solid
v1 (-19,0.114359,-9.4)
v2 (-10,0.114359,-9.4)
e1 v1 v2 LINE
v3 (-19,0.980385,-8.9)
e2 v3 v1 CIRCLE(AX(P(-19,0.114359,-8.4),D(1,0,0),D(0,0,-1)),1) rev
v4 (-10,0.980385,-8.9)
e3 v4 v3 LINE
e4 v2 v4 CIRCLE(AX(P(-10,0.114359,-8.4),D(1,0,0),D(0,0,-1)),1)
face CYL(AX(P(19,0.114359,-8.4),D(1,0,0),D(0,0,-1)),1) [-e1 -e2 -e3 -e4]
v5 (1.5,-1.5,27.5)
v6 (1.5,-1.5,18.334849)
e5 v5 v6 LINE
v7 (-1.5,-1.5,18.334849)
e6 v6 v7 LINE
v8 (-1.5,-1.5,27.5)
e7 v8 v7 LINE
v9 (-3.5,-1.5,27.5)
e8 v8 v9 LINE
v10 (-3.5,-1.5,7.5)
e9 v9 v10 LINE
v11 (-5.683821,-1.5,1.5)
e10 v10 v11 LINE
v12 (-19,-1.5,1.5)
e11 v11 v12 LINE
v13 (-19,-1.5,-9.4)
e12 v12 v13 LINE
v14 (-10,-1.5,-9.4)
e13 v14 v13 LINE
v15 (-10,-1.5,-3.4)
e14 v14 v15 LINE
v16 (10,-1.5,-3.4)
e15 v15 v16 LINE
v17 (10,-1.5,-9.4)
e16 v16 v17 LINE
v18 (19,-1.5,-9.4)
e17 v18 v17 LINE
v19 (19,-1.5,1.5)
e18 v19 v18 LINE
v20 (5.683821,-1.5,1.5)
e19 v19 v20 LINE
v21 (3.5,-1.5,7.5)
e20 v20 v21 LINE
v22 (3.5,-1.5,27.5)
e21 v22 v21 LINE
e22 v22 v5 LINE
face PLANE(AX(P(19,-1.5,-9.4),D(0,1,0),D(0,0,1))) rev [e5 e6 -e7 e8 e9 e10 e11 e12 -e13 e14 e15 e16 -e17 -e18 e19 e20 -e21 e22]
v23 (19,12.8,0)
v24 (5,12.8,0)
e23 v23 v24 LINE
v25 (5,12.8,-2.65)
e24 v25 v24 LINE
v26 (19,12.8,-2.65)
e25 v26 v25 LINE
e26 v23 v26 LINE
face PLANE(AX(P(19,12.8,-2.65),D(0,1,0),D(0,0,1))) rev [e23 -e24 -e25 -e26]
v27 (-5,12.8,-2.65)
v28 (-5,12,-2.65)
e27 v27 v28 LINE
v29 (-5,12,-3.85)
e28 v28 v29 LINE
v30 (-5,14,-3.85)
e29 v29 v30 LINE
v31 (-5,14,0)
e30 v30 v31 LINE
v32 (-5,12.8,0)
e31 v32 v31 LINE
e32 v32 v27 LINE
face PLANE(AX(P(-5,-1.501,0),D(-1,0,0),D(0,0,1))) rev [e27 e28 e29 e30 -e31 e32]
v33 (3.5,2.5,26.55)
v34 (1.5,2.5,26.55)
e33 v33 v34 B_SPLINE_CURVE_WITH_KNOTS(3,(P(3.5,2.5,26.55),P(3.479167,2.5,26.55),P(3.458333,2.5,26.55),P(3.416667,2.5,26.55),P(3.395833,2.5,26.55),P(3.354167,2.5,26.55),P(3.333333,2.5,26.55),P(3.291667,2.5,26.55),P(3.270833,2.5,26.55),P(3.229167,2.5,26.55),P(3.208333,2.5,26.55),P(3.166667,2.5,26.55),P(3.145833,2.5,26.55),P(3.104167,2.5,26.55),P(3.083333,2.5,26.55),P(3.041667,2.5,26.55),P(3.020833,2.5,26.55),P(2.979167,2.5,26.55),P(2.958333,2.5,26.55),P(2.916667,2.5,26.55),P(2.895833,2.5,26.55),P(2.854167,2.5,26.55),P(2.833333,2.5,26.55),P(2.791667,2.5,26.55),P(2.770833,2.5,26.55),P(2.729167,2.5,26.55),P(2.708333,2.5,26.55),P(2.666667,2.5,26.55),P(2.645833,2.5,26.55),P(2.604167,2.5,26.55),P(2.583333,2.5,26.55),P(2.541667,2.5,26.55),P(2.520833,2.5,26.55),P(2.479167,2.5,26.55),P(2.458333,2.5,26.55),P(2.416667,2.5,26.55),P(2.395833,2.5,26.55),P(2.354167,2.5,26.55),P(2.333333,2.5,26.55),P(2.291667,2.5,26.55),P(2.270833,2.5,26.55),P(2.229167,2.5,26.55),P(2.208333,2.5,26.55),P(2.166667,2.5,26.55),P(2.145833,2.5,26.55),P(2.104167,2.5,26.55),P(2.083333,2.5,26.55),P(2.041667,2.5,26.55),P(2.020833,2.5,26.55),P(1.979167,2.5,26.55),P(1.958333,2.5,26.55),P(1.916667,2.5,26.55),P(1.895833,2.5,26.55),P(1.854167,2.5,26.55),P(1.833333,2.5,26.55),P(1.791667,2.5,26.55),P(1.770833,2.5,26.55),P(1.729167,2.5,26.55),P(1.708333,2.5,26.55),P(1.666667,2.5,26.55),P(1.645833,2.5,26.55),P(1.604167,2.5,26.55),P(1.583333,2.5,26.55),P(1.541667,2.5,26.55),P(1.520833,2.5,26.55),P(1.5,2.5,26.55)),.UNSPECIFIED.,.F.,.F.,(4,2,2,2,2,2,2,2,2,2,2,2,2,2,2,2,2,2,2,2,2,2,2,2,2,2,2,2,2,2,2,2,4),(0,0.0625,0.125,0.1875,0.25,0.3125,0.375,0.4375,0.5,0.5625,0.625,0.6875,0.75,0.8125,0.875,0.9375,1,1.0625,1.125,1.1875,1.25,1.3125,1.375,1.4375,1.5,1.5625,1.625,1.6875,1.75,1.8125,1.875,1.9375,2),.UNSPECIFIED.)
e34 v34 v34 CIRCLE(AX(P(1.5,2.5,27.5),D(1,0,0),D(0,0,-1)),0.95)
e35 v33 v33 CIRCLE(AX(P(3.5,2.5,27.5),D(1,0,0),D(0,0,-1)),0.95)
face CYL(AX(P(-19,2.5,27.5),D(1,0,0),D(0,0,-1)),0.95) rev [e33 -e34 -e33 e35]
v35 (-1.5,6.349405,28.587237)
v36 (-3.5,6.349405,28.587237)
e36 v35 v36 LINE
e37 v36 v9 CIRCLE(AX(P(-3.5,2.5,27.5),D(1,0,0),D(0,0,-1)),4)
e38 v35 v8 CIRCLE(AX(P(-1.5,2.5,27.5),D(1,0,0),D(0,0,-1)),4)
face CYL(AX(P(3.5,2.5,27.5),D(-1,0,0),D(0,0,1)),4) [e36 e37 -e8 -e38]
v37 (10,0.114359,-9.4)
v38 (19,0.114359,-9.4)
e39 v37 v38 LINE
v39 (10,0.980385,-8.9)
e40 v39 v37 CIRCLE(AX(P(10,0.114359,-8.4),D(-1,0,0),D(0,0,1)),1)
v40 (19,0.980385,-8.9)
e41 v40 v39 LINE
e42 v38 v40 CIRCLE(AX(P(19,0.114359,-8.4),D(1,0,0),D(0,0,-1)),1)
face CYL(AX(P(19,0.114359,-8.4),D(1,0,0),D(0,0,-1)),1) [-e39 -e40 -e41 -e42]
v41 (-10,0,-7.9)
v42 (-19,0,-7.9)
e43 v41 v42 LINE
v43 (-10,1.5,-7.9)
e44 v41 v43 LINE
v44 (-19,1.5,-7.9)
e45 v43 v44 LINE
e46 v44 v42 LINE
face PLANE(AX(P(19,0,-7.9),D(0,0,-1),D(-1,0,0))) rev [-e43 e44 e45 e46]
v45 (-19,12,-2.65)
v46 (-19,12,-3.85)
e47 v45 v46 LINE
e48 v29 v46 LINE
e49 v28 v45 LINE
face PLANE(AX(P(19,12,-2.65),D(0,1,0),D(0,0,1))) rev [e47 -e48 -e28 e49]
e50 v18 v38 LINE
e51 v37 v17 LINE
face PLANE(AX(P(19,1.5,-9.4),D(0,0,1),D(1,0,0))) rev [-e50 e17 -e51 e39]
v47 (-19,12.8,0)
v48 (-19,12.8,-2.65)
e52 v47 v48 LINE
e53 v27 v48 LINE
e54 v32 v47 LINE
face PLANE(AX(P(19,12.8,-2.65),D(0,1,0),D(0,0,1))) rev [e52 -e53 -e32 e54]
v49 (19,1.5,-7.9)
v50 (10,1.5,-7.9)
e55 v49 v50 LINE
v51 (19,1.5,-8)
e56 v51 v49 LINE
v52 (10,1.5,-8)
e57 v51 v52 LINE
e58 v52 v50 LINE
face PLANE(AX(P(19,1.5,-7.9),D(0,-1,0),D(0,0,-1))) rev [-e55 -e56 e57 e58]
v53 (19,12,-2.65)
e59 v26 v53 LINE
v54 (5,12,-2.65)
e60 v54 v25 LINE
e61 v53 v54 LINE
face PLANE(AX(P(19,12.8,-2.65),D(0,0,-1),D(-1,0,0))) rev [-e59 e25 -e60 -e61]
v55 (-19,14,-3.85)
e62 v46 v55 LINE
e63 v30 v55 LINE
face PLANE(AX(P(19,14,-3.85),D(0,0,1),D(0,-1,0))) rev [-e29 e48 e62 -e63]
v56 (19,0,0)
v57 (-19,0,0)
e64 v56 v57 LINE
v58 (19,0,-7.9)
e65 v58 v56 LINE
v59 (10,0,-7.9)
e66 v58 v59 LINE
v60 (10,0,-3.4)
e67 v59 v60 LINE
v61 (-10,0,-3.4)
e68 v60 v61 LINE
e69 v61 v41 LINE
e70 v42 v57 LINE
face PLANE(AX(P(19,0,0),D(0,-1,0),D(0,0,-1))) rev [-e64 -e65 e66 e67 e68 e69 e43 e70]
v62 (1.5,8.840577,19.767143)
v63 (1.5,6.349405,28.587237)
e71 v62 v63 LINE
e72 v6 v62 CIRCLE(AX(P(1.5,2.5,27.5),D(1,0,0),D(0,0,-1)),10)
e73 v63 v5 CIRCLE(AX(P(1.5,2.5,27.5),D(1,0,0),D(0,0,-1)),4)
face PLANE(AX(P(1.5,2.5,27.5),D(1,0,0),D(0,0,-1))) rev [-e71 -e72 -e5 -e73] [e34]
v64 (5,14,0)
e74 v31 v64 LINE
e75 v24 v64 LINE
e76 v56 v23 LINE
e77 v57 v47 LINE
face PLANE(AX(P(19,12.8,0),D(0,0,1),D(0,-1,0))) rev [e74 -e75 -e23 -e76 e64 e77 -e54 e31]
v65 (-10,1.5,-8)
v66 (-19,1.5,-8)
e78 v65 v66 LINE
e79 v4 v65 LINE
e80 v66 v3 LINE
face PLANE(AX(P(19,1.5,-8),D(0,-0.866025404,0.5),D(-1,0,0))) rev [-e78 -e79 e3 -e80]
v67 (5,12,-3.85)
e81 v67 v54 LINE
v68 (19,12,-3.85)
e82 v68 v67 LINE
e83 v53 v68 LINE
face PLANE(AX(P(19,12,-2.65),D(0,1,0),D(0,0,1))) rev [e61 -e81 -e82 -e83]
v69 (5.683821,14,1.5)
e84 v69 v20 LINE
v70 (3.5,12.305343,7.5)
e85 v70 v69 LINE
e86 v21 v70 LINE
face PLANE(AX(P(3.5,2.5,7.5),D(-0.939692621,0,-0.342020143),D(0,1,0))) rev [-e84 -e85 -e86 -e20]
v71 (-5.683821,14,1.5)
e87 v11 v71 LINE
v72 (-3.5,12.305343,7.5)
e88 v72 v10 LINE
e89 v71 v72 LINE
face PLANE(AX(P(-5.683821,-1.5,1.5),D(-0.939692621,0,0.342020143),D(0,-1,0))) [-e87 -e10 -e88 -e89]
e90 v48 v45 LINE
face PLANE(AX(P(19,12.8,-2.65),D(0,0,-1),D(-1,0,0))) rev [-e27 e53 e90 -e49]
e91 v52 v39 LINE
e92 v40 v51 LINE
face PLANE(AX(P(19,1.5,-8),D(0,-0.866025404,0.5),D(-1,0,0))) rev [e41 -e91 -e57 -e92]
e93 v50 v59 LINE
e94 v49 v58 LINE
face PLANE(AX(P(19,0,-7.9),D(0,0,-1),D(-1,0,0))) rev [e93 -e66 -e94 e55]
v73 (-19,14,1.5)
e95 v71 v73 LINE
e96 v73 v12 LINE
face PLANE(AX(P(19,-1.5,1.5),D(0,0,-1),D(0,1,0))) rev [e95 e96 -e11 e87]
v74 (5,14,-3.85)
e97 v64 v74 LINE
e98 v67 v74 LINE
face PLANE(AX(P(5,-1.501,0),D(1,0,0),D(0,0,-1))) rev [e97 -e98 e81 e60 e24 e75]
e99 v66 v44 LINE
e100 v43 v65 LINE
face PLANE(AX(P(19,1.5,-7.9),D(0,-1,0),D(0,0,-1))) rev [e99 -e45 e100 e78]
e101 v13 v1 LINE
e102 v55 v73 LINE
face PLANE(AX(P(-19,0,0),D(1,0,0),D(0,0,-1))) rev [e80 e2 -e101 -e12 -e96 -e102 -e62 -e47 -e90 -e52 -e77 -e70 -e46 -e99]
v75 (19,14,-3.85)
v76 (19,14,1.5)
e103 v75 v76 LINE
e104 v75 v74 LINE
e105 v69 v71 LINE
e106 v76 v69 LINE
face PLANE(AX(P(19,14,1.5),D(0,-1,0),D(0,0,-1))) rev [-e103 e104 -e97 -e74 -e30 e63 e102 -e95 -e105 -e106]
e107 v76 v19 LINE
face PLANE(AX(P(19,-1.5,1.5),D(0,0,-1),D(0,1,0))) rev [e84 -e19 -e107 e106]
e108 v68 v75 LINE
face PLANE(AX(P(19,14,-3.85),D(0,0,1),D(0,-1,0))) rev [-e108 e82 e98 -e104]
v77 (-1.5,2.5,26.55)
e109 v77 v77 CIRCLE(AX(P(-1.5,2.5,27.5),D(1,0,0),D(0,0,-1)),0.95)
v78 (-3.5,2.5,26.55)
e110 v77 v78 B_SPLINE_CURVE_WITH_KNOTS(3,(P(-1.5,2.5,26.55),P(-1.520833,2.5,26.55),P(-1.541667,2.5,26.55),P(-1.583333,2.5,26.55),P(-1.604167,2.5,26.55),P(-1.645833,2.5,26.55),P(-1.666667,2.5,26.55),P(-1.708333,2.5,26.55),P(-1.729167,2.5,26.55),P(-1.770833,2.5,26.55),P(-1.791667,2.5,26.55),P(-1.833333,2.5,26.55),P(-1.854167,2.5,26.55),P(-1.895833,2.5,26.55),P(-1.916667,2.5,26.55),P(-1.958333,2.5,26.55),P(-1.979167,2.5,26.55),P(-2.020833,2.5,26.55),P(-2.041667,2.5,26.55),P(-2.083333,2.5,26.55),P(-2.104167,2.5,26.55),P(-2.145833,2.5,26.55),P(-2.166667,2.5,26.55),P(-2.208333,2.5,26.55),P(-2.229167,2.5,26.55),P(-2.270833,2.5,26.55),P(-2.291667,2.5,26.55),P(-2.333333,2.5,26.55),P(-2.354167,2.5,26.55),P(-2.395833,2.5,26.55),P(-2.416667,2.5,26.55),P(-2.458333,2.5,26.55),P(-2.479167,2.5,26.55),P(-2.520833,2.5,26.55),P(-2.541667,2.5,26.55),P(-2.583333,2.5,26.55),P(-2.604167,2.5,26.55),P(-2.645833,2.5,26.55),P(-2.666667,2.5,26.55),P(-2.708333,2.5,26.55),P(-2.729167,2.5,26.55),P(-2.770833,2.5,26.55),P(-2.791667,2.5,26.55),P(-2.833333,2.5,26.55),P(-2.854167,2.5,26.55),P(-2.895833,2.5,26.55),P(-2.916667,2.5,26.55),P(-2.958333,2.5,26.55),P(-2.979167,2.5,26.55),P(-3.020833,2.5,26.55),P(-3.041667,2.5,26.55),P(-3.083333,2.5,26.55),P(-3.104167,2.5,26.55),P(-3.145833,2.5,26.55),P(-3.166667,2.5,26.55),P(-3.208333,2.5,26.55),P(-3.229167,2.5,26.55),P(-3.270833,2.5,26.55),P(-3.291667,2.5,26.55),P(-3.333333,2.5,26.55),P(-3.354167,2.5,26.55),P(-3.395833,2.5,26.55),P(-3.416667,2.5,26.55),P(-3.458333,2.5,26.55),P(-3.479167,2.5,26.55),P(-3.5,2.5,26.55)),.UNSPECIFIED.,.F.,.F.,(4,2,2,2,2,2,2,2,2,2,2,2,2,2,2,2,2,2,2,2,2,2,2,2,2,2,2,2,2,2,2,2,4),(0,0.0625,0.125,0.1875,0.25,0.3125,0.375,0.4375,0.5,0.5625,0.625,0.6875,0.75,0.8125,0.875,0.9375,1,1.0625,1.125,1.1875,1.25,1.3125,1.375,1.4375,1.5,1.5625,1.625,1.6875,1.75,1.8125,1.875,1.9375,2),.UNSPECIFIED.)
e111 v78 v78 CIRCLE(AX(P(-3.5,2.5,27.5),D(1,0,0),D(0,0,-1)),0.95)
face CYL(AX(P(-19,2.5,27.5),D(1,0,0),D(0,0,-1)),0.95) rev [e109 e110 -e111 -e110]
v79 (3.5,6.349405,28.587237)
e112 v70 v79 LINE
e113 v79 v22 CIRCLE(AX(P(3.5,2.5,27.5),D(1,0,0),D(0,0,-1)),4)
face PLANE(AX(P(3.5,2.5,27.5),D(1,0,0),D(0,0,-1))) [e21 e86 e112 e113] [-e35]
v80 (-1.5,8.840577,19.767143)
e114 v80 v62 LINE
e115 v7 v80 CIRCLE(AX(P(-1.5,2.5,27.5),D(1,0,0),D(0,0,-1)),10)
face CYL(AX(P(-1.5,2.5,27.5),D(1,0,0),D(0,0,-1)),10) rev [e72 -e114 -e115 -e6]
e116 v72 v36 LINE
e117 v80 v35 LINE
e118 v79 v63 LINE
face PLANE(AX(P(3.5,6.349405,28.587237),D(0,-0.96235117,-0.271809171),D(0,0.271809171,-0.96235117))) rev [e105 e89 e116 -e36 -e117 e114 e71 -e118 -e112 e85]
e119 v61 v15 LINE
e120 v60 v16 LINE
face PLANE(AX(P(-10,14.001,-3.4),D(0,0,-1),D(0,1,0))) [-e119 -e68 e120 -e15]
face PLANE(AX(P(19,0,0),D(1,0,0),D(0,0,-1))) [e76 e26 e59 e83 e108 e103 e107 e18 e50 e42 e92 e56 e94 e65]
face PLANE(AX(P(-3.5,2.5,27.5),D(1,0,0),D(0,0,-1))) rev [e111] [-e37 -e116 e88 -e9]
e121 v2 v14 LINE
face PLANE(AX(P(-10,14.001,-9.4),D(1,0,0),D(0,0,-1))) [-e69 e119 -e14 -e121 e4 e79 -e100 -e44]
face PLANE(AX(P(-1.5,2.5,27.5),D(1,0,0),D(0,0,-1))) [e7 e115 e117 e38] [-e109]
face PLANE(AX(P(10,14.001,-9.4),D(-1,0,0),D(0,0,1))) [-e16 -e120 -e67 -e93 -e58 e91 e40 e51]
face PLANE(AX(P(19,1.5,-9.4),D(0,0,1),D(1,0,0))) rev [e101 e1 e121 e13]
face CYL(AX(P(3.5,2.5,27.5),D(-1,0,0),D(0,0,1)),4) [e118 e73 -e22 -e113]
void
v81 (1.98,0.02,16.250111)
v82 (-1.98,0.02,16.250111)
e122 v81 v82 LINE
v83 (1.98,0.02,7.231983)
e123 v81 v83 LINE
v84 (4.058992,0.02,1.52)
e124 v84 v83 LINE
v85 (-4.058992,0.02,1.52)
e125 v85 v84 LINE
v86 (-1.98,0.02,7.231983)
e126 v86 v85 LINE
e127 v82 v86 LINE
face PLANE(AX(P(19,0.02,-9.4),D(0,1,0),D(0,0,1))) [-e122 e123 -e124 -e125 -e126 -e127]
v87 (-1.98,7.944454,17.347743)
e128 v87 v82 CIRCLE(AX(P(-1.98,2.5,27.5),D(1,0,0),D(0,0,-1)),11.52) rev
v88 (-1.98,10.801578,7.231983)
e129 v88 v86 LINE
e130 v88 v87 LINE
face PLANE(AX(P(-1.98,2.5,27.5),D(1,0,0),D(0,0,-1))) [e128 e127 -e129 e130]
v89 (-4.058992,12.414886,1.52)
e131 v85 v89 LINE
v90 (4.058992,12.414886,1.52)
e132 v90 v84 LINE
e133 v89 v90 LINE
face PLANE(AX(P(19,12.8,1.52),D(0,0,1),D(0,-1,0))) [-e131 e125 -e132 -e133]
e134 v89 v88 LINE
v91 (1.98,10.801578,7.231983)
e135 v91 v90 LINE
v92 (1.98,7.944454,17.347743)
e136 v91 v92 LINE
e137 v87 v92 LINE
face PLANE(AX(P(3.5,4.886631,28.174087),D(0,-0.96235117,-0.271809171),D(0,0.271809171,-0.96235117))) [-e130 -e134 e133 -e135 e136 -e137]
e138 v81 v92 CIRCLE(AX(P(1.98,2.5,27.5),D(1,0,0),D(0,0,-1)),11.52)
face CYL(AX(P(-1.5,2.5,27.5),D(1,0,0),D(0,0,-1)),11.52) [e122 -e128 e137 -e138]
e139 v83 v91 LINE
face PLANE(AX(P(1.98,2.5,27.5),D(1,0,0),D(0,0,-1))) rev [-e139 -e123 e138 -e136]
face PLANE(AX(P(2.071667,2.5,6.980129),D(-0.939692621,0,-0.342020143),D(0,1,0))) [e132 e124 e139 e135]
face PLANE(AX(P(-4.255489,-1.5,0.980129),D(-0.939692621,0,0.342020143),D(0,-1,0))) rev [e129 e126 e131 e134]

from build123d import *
from OCP.BRepFilletAPI import BRepFilletAPI_MakeChamfer

# Parameters (mm, degrees)
EXTRUDE_1_DEPTH     = 19
CUT_EXTRUDE_1_REACH = 28.26
SKETCH_6_W          = 20
SKETCH_6_H          = 6
CHAMFER_1_SIZE      = 1.4
CHAMFER_1_SIZE2     = 0.808290377
CUT_EXTRUDE_3_REACH = 28.26
SKETCH_9_W          = 10
SKETCH_9_H          = 3.85
FILLET_4_R          = 1
EXTRUDE_4_DEPTH     = 3.5
SKETCH_11_R         = 10
CUT_EXTRUDE_4_DEPTH = 1.5
CHAMFER_2_SIZE      = 6
CHAMFER_2_SIZE_2    = 2.183821406
SHELL_START         = -1.98
SHELL_4_DEPTH       = 3.96
SHELL_START_2       = 0.02
SHELL_4_2_DEPTH     = 12.394886134
SHELL_START_3       = 12.360630137
SHELL_4_3_DEPTH     = 1.52
SKETCH_12_R         = 0.95
CUT_EXTRUDE_5_DEPTH = 42.164304926


with BuildPart() as part:
    # 草圖1 → 填料-伸長1 (new, symmetric)
    with BuildSketch(Plane(origin=(0, 0, 0), x_dir=(0, 0, -1), z_dir=(1, 0, 0))):
        Polygon((0, 12.8), (0, 0), (7.9, 0), (7.9, 1.5), (9.4, 1.5), (9.4, -1.5), (-1.5, -1.5), (-1.5, 14), (3.85, 14), (3.85, 12), (2.65, 12), (2.65, 12.8), align=None)
    extrude(amount=EXTRUDE_1_DEPTH, both=True)

    # 草圖6 → 除料-伸長1 (cut, up to next)
    with BuildSketch(Plane(origin=(0, -1.5, 0), x_dir=(1, 0, 0), z_dir=(0, 1, 0)), mode=Mode.PRIVATE) as cut_extrude_1_sk1:
        with Locations((0, 6.4)):
            Rectangle(SKETCH_6_W, SKETCH_6_H)
    cut_extrude_1_tool1 = extrude(cut_extrude_1_sk1.sketch, amount=CUT_EXTRUDE_1_REACH, mode=Mode.PRIVATE) & part.part
    add(cut_extrude_1_tool1.solids().sort_by_distance((0, -1.5, -6.4))[0], mode=Mode.SUBTRACT)

    # 導角1: one chamfer whose edges measure the first distance from different faces: ONE call of the kernel's chamfer builder (chamfer() names one face for all edges)
    chamfer_1_edges_1 = [part.edges().sort_by_distance(p)[0] for p in [
        (14.5, 1.5, -9.4),
    ]]
    chamfer_1_side_1 = [part.faces().sort_by_distance(p)[0] for p in [
        (14.5, 1.5, -8.65),
    ]]
    chamfer_1_edges_2 = [part.edges().sort_by_distance(p)[0] for p in [
        (-14.5, 1.5, -9.4),
    ]]
    chamfer_1_side_2 = [part.faces().sort_by_distance(p)[0] for p in [
        (-14.5, 1.5, -8.65),
    ]]
    chamfer_1 = BRepFilletAPI_MakeChamfer(part.part.solid().wrapped)
    for e in chamfer_1_edges_1:
        chamfer_1.Add(CHAMFER_1_SIZE, CHAMFER_1_SIZE2, e.wrapped, chamfer_1_side_1[0].wrapped)  # the first distance lies on this face
    for e in chamfer_1_edges_2:
        chamfer_1.Add(CHAMFER_1_SIZE, CHAMFER_1_SIZE2, e.wrapped, chamfer_1_side_2[0].wrapped)  # the first distance lies on this face
    add(Compound.cast(chamfer_1.Shape()), mode=Mode.REPLACE)

    # 草圖9 → 除料-伸長3 (cut, up to next)
    with BuildSketch(Plane(origin=(0, 14, 0), x_dir=(1, 0, 0), z_dir=(0, 1, 0)), mode=Mode.PRIVATE) as cut_extrude_3_sk1:
        with Locations((0, 1.925)):
            Rectangle(SKETCH_9_W, SKETCH_9_H)
    cut_extrude_3_tool1 = extrude(cut_extrude_3_sk1.sketch, amount=-CUT_EXTRUDE_3_REACH, mode=Mode.PRIVATE) & part.part
    add(cut_extrude_3_tool1.solids().sort_by_distance((0, 14, -1.925))[0], mode=Mode.SUBTRACT)

    # 圓角4
    fillet_4_edges = [part.edges().sort_by_distance(p)[0] for p in [
        (14.5, 0.691709623, -9.4),
        (-14.5, 0.691709623, -9.4),
    ]]
    fillet(fillet_4_edges, radius=FILLET_4_R)

    # 草圖10 → 填料-伸長4 (add, symmetric)
    with BuildSketch(Plane(origin=(0, 0, 0), x_dir=(0, 0, -1), z_dir=(1, 0, 0))):
        with BuildLine():
            Line((-1.5, -1.5), (-27.5, -1.5))
            ThreePointArc((-27.5, -1.5), (-31.462172303, 1.951191618), (-28.587236685, 6.34940468))
            Line((-28.587236685, 6.34940468), (-1.5, 14))
            Line((-1.5, 14), (-1.5, -1.5))
        make_face()
    extrude(amount=EXTRUDE_4_DEPTH, both=True)

    # 草圖11 → 除料-伸長4 (cut, symmetric)
    with BuildSketch(Plane(origin=(0, 0, 0), x_dir=(0, 0, -1), z_dir=(1, 0, 0))):
        with Locations((-27.5, 2.5)):
            Circle(SKETCH_11_R)
    extrude(amount=CUT_EXTRUDE_4_DEPTH, both=True, mode=Mode.SUBTRACT)

    # 導角2
    # the kernel refuses this chamfer: 6, 2.183821406 mm, written as the material it adds along each edge
    with BuildSketch(Plane(origin=(-3.5, 14, 1.5), x_dir=(0, 0, 1), z_dir=(0, -1, 0))) as chamfer_2_piece_1_section:
        Polygon((CHAMFER_2_SIZE, 0), (0, CHAMFER_2_SIZE_2), (0, 0), align=None)
    chamfer_2_piece_1 = extrude(amount=15.5, mode=Mode.PRIVATE)
    chamfer_2_piece_1 = split(chamfer_2_piece_1, bisect_by=Plane(origin=(-3.5, 14, 1.5), z_dir=(0, -0.9623511699869516, -0.2718091713403826)), keep=Keep.TOP, mode=Mode.PRIVATE)
    add(chamfer_2_piece_1)
    with BuildSketch(Plane(origin=(3.5, 14, 1.5), x_dir=(0, 0, 1), z_dir=(0, -1, 0))) as chamfer_2_piece_2_section:
        Polygon((CHAMFER_2_SIZE, 0), (0, -CHAMFER_2_SIZE_2), (0, 0), align=None)
    chamfer_2_piece_2 = extrude(amount=15.5, mode=Mode.PRIVATE)
    chamfer_2_piece_2 = split(chamfer_2_piece_2, bisect_by=Plane(origin=(3.5, 14, 1.5), z_dir=(0, -0.9623511699869516, -0.2718091713403826)), keep=Keep.TOP, mode=Mode.PRIVATE)
    add(chamfer_2_piece_2)

    # 薄殼4: read off the stored shape, not the designer's step
    # 薄殼4 outline → 薄殼4 (cut)
    with BuildSketch(Plane.YZ.offset(SHELL_START)):
        with BuildLine():
            Line((0.02, 1.52), (12.414886134, 1.52))
            Line((12.414886134, 1.52), (7.944453878, 17.347743011))
            ThreePointArc((7.944453878, 17.347743011), (4.08056814, 16.088943767), (0.02, 16.250111112))
            Line((0.02, 16.250111112), (0.02, 1.52))
        make_face()
    extrude(amount=SHELL_4_DEPTH, mode=Mode.SUBTRACT)

    # Shell 4 2 outline → Shell 4 2 (cut)
    with BuildSketch(Plane(origin=(0, 0, 0), x_dir=(1, 0, 0), z_dir=(0, 1, 0)).offset(SHELL_START_2)):
        Polygon((4.058991787, -1.52), (1.98, -1.52), (1.98, -7.231982989), align=None)
        Polygon((-1.98, -1.52), (-4.058991787, -1.52), (-1.98, -7.231982989), align=None)
    extrude(amount=SHELL_4_2_DEPTH, mode=Mode.SUBTRACT)

    # Shell 4 3 outline → Shell 4 3 (add)
    with BuildSketch(Plane(origin=(0, 0, 0), x_dir=(1, 0, 0), z_dir=(0, 0.9623511699869516, 0.2718091713403829)).offset(SHELL_START_3)):
        Polygon((4.058991787, 1.911706134), (-4.058991787, 1.911706134), (-1.98, -4.023739437), (-1.98, -14.535245358), (1.98, -14.535245358), (1.98, -4.023739437), align=None)
    extrude(amount=SHELL_4_3_DEPTH)

    # 草圖12 → 除料-伸長5 (cut, through all)
    with BuildSketch(Plane(origin=(3.5, 0, 0), x_dir=(0, 0, -1), z_dir=(1, 0, 0))):
        with Locations((-27.5, 2.5)):
            Circle(SKETCH_12_R)
    extrude(amount=-CUT_EXTRUDE_5_DEPTH, mode=Mode.SUBTRACT)


solid = part.part
